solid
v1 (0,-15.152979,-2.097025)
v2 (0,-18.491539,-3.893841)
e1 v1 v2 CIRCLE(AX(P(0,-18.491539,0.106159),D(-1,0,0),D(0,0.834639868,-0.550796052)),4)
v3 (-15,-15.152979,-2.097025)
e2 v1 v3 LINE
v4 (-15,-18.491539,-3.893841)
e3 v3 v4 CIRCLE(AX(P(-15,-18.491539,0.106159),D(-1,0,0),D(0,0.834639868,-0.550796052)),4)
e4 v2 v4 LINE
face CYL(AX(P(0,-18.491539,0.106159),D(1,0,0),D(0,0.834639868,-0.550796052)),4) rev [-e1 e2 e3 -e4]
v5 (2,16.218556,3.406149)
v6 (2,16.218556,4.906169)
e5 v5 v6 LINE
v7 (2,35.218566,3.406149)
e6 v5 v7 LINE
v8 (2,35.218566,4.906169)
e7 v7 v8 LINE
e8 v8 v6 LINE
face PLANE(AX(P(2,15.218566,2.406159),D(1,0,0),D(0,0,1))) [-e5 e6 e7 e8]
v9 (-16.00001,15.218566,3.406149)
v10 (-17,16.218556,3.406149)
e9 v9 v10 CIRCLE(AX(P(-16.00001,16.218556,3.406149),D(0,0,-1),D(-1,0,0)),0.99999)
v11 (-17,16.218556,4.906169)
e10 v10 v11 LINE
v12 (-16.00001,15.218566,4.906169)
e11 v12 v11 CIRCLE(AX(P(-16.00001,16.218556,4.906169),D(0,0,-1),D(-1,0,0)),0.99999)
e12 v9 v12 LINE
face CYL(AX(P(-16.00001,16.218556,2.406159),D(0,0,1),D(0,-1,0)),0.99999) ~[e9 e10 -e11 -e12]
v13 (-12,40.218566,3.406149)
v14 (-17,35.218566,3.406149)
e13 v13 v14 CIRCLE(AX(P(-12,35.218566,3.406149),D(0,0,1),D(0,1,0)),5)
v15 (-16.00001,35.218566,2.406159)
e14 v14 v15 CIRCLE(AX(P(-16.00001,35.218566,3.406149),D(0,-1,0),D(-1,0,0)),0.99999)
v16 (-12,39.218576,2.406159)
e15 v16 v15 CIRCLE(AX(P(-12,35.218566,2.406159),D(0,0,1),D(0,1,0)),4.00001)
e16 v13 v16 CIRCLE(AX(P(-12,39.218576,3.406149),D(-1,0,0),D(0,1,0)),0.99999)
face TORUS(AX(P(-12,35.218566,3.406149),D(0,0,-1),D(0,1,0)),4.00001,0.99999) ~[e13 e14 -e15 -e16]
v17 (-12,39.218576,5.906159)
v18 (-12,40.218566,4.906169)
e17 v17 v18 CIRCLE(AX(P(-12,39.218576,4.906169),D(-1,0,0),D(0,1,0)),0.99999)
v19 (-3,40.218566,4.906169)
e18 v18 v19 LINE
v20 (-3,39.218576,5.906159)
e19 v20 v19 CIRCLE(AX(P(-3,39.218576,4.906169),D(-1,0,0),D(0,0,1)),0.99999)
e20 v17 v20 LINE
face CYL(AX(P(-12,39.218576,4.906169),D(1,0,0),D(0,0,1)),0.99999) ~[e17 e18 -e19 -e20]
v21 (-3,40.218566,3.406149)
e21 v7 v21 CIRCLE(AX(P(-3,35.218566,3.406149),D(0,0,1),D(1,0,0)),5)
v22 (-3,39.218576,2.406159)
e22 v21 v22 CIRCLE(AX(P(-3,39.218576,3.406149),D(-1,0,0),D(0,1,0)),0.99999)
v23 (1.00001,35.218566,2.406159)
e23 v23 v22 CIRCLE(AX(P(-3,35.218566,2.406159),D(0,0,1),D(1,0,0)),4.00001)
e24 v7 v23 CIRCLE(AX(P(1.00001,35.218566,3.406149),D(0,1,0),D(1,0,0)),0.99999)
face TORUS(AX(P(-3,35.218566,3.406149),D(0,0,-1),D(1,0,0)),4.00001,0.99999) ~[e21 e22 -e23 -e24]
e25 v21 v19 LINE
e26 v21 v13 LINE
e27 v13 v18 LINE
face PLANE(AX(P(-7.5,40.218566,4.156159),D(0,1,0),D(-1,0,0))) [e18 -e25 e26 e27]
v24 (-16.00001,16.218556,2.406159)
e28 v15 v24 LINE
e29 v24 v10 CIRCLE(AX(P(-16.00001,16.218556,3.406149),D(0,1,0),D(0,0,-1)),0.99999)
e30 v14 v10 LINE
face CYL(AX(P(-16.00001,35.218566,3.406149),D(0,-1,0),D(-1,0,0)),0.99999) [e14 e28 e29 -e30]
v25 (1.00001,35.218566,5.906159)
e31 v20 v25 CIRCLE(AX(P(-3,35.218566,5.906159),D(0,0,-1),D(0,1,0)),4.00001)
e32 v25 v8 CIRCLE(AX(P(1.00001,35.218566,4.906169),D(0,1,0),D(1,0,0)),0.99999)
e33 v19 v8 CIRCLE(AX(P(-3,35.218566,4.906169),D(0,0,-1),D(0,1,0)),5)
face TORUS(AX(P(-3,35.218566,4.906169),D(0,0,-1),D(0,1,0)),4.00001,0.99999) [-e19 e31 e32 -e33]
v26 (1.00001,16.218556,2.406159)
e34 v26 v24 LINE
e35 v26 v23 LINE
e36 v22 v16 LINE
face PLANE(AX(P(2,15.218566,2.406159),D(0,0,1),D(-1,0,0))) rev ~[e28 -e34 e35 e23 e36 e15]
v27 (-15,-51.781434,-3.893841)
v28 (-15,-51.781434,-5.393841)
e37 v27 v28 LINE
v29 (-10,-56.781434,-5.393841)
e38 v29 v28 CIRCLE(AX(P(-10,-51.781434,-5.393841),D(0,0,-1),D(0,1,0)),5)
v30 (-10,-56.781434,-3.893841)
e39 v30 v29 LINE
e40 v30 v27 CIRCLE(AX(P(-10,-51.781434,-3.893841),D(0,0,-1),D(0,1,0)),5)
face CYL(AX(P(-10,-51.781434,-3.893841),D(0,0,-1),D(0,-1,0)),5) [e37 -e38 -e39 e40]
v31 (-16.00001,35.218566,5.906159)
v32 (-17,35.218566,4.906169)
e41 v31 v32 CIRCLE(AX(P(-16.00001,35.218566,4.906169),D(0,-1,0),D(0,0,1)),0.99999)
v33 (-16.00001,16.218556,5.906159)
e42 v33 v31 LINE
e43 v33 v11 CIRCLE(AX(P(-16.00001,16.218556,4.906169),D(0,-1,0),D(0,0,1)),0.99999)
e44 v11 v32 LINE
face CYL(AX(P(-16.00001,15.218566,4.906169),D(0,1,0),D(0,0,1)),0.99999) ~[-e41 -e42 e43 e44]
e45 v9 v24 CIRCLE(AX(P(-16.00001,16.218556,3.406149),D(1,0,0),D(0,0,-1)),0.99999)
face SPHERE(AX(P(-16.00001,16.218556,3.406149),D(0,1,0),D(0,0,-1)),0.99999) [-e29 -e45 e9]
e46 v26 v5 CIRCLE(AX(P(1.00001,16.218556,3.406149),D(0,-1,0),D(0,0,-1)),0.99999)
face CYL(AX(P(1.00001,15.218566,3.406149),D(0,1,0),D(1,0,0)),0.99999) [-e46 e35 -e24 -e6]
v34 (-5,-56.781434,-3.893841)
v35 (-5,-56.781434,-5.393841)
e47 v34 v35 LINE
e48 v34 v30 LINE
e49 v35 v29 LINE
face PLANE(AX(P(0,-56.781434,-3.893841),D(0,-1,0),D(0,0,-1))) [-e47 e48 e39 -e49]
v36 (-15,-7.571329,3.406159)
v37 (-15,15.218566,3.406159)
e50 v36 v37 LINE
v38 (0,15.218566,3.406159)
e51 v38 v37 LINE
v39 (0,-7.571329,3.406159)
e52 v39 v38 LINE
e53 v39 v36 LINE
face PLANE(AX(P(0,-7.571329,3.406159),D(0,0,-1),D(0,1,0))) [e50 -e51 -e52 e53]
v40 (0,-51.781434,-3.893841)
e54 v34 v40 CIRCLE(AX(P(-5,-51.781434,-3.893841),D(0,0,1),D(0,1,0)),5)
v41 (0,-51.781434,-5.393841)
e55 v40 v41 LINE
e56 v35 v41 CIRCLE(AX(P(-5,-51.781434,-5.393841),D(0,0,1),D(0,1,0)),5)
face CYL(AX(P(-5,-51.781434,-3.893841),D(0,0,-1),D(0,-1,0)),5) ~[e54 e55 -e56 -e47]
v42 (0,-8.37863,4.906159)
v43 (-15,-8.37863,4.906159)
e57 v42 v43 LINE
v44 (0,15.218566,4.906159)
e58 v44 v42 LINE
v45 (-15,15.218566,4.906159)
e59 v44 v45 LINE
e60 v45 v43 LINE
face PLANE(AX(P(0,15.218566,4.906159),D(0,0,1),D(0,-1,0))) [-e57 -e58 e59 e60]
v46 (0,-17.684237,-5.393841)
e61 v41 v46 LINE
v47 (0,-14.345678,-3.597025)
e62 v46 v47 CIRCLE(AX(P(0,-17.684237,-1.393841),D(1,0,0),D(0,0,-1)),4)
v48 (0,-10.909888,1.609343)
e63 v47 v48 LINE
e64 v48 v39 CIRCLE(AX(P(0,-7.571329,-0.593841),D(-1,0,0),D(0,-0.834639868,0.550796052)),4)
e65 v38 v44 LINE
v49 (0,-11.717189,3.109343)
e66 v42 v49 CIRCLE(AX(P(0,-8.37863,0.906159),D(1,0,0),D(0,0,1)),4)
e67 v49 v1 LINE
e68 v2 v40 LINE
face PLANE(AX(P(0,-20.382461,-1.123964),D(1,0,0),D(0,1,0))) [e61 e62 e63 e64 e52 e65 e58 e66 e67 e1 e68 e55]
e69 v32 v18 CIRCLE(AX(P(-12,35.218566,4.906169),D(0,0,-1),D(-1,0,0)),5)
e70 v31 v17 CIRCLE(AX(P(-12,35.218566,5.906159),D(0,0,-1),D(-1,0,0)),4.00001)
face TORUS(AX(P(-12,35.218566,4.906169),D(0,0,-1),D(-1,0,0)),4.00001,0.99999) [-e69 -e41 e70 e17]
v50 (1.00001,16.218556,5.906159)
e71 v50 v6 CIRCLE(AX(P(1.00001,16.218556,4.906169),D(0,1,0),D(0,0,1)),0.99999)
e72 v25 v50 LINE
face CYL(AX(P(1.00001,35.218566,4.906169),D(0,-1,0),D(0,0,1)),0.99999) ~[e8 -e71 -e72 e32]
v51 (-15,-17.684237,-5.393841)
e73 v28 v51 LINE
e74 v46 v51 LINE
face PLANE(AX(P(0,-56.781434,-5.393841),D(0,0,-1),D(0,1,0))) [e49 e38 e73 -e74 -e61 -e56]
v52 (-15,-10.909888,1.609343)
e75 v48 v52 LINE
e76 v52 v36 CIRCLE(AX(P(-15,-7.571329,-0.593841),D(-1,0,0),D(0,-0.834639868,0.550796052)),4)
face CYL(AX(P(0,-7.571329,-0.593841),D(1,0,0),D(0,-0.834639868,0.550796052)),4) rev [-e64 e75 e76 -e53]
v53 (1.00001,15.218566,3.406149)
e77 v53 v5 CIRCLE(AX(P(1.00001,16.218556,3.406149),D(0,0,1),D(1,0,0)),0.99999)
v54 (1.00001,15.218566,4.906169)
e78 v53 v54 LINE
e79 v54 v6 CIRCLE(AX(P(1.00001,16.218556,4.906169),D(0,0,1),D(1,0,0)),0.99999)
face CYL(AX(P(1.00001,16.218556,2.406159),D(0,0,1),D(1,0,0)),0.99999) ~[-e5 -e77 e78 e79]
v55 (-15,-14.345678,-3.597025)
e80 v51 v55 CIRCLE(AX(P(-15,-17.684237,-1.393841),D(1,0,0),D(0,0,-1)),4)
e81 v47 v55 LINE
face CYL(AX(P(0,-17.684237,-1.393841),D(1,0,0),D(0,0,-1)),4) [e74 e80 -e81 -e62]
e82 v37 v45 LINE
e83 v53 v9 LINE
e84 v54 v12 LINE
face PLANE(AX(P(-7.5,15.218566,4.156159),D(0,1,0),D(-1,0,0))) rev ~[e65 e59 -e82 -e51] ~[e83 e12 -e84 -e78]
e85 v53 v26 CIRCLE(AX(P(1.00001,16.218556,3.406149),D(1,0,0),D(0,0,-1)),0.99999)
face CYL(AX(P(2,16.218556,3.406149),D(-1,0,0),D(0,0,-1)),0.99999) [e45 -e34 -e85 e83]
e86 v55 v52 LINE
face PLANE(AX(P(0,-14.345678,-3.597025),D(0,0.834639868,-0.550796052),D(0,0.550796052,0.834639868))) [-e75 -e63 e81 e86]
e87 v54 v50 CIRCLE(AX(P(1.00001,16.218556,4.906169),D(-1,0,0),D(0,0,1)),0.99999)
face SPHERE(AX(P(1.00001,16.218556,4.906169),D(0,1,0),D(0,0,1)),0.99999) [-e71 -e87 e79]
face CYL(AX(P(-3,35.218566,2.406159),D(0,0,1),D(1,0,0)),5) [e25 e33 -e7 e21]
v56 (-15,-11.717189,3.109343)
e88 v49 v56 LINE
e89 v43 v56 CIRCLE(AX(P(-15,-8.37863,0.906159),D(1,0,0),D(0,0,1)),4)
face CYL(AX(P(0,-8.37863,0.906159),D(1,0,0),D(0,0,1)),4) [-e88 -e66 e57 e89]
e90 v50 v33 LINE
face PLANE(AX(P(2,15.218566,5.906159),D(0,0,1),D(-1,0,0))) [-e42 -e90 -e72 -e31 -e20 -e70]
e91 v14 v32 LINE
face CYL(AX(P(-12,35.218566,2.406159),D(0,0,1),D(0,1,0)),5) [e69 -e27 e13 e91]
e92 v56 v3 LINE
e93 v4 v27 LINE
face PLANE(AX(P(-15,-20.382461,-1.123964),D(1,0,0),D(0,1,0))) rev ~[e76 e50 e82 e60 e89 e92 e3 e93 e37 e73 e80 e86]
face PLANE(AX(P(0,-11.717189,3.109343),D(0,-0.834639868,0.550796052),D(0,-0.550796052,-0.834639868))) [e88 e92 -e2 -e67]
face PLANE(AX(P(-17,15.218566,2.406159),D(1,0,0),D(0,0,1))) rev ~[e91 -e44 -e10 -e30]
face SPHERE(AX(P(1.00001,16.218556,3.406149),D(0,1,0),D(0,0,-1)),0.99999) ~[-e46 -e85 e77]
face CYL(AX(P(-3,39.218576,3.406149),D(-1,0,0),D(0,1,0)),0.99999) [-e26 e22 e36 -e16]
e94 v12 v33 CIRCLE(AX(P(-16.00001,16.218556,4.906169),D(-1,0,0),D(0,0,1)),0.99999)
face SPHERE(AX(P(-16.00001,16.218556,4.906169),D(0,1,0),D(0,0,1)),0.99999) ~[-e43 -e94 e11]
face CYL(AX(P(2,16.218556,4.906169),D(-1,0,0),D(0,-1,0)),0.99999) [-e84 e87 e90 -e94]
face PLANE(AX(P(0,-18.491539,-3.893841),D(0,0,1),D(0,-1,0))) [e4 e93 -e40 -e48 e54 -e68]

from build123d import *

# Parameters (mm, degrees)
F1_DEPTH = 15
F2_R     = 5
F3_W     = 19
F3_H     = 3.5
F4_DEPTH = 25
F5_R     = 5
F6_R     = 0.99999


# Not quite as in the source:
# - a fillet or chamfer is up to 0.001 mm smaller than in the source, because OpenCascade refuses the exact size


with BuildPart() as f1:
    # F0 (on Right) → F1 (new body)
    with BuildSketch(Plane.YZ):
        with BuildLine():
            Line((15.2185663986, 4.9061592609), (-8.3786299068, 4.9061592609))
            ThreePointArc((-8.3786299068, 4.9061592609), (-10.2743175345, 4.4284267718), (-11.7171893777, 3.10934347))
            Line((-11.7171893777, 3.10934347), (-15.1529792105, -2.0970249483))
            ThreePointArc((-15.1529792105, -2.0970249483), (-16.5958510537, -3.41610825), (-18.4915386814, -3.8938407391))
            Line((-18.4915386814, -3.8938407391), (-56.7814336014, -3.8938407391))
            Line((-56.7814336014, -3.8938407391), (-56.7814336014, -5.3938407391))
            Line((-56.7814336014, -5.3938407391), (-17.6842372959, -5.3938407391))
            ThreePointArc((-17.6842372959, -5.3938407391), (-15.7885496683, -4.91610825), (-14.3456778251, -3.5970249483))
            Line((-14.3456778251, -3.5970249483), (-10.9098879922, 1.60934347))
            ThreePointArc((-10.9098879922, 1.60934347), (-9.467016149, 2.9284267718), (-7.5713285214, 3.4061592609))
            Line((-7.5713285214, 3.4061592609), (15.2185663986, 3.4061592609))
            Line((15.2185663986, 3.4061592609), (15.2185663986, 4.9061592609))
        make_face()
    extrude(amount=-F1_DEPTH)

    # F2
    f2_edges = [f1.edges().sort_by_distance(p)[0] for p in [
        (-15, -56.781434, -4.643841),
        (0, -56.781434, -4.643841),
    ]]
    fillet(f2_edges, radius=F2_R)

    # F3 (on face) → F4 (join)
    with BuildSketch(Plane(origin=(0, 15.2185663986, 0), x_dir=(-1, 0, 0), z_dir=(0, 1, 0))):
        with Locations((7.5, 4.1561592609)):
            Rectangle(F3_W, F3_H)
    extrude(amount=F4_DEPTH)

    # F5
    f5_edges = [f1.edges().sort_by_distance(p)[0] for p in [
        (2, 40.218566, 4.156159),
        (-17, 40.218566, 4.156159),
    ]]
    fillet(f5_edges, radius=F5_R)

    # F6 (radius 1 in the source; OpenCascade refuses exactly that, so slightly less here)
    f6_edges = [f1.edges().sort_by_distance(p)[0] for p in [
        (-17, 25.218566, 5.906159),
        (-15.535534, 38.7541, 5.906159),
        (-7.5, 15.218566, 5.906159),
        (-7.5, 40.218566, 5.906159),
        (2, 25.218566, 5.906159),
        (0.535534, 38.7541, 5.906159),
        (2, 25.218566, 2.406159),
        (0.535534, 38.7541, 2.406159),
        (-7.5, 15.218566, 2.406159),
        (-7.5, 40.218566, 2.406159),
        (-17, 25.218566, 2.406159),
        (-15.535534, 38.7541, 2.406159),
        (2, 15.218566, 4.156159),
        (-17, 15.218566, 4.156159),
    ]]
    fillet(f6_edges, radius=F6_R)


solid = f1.part
